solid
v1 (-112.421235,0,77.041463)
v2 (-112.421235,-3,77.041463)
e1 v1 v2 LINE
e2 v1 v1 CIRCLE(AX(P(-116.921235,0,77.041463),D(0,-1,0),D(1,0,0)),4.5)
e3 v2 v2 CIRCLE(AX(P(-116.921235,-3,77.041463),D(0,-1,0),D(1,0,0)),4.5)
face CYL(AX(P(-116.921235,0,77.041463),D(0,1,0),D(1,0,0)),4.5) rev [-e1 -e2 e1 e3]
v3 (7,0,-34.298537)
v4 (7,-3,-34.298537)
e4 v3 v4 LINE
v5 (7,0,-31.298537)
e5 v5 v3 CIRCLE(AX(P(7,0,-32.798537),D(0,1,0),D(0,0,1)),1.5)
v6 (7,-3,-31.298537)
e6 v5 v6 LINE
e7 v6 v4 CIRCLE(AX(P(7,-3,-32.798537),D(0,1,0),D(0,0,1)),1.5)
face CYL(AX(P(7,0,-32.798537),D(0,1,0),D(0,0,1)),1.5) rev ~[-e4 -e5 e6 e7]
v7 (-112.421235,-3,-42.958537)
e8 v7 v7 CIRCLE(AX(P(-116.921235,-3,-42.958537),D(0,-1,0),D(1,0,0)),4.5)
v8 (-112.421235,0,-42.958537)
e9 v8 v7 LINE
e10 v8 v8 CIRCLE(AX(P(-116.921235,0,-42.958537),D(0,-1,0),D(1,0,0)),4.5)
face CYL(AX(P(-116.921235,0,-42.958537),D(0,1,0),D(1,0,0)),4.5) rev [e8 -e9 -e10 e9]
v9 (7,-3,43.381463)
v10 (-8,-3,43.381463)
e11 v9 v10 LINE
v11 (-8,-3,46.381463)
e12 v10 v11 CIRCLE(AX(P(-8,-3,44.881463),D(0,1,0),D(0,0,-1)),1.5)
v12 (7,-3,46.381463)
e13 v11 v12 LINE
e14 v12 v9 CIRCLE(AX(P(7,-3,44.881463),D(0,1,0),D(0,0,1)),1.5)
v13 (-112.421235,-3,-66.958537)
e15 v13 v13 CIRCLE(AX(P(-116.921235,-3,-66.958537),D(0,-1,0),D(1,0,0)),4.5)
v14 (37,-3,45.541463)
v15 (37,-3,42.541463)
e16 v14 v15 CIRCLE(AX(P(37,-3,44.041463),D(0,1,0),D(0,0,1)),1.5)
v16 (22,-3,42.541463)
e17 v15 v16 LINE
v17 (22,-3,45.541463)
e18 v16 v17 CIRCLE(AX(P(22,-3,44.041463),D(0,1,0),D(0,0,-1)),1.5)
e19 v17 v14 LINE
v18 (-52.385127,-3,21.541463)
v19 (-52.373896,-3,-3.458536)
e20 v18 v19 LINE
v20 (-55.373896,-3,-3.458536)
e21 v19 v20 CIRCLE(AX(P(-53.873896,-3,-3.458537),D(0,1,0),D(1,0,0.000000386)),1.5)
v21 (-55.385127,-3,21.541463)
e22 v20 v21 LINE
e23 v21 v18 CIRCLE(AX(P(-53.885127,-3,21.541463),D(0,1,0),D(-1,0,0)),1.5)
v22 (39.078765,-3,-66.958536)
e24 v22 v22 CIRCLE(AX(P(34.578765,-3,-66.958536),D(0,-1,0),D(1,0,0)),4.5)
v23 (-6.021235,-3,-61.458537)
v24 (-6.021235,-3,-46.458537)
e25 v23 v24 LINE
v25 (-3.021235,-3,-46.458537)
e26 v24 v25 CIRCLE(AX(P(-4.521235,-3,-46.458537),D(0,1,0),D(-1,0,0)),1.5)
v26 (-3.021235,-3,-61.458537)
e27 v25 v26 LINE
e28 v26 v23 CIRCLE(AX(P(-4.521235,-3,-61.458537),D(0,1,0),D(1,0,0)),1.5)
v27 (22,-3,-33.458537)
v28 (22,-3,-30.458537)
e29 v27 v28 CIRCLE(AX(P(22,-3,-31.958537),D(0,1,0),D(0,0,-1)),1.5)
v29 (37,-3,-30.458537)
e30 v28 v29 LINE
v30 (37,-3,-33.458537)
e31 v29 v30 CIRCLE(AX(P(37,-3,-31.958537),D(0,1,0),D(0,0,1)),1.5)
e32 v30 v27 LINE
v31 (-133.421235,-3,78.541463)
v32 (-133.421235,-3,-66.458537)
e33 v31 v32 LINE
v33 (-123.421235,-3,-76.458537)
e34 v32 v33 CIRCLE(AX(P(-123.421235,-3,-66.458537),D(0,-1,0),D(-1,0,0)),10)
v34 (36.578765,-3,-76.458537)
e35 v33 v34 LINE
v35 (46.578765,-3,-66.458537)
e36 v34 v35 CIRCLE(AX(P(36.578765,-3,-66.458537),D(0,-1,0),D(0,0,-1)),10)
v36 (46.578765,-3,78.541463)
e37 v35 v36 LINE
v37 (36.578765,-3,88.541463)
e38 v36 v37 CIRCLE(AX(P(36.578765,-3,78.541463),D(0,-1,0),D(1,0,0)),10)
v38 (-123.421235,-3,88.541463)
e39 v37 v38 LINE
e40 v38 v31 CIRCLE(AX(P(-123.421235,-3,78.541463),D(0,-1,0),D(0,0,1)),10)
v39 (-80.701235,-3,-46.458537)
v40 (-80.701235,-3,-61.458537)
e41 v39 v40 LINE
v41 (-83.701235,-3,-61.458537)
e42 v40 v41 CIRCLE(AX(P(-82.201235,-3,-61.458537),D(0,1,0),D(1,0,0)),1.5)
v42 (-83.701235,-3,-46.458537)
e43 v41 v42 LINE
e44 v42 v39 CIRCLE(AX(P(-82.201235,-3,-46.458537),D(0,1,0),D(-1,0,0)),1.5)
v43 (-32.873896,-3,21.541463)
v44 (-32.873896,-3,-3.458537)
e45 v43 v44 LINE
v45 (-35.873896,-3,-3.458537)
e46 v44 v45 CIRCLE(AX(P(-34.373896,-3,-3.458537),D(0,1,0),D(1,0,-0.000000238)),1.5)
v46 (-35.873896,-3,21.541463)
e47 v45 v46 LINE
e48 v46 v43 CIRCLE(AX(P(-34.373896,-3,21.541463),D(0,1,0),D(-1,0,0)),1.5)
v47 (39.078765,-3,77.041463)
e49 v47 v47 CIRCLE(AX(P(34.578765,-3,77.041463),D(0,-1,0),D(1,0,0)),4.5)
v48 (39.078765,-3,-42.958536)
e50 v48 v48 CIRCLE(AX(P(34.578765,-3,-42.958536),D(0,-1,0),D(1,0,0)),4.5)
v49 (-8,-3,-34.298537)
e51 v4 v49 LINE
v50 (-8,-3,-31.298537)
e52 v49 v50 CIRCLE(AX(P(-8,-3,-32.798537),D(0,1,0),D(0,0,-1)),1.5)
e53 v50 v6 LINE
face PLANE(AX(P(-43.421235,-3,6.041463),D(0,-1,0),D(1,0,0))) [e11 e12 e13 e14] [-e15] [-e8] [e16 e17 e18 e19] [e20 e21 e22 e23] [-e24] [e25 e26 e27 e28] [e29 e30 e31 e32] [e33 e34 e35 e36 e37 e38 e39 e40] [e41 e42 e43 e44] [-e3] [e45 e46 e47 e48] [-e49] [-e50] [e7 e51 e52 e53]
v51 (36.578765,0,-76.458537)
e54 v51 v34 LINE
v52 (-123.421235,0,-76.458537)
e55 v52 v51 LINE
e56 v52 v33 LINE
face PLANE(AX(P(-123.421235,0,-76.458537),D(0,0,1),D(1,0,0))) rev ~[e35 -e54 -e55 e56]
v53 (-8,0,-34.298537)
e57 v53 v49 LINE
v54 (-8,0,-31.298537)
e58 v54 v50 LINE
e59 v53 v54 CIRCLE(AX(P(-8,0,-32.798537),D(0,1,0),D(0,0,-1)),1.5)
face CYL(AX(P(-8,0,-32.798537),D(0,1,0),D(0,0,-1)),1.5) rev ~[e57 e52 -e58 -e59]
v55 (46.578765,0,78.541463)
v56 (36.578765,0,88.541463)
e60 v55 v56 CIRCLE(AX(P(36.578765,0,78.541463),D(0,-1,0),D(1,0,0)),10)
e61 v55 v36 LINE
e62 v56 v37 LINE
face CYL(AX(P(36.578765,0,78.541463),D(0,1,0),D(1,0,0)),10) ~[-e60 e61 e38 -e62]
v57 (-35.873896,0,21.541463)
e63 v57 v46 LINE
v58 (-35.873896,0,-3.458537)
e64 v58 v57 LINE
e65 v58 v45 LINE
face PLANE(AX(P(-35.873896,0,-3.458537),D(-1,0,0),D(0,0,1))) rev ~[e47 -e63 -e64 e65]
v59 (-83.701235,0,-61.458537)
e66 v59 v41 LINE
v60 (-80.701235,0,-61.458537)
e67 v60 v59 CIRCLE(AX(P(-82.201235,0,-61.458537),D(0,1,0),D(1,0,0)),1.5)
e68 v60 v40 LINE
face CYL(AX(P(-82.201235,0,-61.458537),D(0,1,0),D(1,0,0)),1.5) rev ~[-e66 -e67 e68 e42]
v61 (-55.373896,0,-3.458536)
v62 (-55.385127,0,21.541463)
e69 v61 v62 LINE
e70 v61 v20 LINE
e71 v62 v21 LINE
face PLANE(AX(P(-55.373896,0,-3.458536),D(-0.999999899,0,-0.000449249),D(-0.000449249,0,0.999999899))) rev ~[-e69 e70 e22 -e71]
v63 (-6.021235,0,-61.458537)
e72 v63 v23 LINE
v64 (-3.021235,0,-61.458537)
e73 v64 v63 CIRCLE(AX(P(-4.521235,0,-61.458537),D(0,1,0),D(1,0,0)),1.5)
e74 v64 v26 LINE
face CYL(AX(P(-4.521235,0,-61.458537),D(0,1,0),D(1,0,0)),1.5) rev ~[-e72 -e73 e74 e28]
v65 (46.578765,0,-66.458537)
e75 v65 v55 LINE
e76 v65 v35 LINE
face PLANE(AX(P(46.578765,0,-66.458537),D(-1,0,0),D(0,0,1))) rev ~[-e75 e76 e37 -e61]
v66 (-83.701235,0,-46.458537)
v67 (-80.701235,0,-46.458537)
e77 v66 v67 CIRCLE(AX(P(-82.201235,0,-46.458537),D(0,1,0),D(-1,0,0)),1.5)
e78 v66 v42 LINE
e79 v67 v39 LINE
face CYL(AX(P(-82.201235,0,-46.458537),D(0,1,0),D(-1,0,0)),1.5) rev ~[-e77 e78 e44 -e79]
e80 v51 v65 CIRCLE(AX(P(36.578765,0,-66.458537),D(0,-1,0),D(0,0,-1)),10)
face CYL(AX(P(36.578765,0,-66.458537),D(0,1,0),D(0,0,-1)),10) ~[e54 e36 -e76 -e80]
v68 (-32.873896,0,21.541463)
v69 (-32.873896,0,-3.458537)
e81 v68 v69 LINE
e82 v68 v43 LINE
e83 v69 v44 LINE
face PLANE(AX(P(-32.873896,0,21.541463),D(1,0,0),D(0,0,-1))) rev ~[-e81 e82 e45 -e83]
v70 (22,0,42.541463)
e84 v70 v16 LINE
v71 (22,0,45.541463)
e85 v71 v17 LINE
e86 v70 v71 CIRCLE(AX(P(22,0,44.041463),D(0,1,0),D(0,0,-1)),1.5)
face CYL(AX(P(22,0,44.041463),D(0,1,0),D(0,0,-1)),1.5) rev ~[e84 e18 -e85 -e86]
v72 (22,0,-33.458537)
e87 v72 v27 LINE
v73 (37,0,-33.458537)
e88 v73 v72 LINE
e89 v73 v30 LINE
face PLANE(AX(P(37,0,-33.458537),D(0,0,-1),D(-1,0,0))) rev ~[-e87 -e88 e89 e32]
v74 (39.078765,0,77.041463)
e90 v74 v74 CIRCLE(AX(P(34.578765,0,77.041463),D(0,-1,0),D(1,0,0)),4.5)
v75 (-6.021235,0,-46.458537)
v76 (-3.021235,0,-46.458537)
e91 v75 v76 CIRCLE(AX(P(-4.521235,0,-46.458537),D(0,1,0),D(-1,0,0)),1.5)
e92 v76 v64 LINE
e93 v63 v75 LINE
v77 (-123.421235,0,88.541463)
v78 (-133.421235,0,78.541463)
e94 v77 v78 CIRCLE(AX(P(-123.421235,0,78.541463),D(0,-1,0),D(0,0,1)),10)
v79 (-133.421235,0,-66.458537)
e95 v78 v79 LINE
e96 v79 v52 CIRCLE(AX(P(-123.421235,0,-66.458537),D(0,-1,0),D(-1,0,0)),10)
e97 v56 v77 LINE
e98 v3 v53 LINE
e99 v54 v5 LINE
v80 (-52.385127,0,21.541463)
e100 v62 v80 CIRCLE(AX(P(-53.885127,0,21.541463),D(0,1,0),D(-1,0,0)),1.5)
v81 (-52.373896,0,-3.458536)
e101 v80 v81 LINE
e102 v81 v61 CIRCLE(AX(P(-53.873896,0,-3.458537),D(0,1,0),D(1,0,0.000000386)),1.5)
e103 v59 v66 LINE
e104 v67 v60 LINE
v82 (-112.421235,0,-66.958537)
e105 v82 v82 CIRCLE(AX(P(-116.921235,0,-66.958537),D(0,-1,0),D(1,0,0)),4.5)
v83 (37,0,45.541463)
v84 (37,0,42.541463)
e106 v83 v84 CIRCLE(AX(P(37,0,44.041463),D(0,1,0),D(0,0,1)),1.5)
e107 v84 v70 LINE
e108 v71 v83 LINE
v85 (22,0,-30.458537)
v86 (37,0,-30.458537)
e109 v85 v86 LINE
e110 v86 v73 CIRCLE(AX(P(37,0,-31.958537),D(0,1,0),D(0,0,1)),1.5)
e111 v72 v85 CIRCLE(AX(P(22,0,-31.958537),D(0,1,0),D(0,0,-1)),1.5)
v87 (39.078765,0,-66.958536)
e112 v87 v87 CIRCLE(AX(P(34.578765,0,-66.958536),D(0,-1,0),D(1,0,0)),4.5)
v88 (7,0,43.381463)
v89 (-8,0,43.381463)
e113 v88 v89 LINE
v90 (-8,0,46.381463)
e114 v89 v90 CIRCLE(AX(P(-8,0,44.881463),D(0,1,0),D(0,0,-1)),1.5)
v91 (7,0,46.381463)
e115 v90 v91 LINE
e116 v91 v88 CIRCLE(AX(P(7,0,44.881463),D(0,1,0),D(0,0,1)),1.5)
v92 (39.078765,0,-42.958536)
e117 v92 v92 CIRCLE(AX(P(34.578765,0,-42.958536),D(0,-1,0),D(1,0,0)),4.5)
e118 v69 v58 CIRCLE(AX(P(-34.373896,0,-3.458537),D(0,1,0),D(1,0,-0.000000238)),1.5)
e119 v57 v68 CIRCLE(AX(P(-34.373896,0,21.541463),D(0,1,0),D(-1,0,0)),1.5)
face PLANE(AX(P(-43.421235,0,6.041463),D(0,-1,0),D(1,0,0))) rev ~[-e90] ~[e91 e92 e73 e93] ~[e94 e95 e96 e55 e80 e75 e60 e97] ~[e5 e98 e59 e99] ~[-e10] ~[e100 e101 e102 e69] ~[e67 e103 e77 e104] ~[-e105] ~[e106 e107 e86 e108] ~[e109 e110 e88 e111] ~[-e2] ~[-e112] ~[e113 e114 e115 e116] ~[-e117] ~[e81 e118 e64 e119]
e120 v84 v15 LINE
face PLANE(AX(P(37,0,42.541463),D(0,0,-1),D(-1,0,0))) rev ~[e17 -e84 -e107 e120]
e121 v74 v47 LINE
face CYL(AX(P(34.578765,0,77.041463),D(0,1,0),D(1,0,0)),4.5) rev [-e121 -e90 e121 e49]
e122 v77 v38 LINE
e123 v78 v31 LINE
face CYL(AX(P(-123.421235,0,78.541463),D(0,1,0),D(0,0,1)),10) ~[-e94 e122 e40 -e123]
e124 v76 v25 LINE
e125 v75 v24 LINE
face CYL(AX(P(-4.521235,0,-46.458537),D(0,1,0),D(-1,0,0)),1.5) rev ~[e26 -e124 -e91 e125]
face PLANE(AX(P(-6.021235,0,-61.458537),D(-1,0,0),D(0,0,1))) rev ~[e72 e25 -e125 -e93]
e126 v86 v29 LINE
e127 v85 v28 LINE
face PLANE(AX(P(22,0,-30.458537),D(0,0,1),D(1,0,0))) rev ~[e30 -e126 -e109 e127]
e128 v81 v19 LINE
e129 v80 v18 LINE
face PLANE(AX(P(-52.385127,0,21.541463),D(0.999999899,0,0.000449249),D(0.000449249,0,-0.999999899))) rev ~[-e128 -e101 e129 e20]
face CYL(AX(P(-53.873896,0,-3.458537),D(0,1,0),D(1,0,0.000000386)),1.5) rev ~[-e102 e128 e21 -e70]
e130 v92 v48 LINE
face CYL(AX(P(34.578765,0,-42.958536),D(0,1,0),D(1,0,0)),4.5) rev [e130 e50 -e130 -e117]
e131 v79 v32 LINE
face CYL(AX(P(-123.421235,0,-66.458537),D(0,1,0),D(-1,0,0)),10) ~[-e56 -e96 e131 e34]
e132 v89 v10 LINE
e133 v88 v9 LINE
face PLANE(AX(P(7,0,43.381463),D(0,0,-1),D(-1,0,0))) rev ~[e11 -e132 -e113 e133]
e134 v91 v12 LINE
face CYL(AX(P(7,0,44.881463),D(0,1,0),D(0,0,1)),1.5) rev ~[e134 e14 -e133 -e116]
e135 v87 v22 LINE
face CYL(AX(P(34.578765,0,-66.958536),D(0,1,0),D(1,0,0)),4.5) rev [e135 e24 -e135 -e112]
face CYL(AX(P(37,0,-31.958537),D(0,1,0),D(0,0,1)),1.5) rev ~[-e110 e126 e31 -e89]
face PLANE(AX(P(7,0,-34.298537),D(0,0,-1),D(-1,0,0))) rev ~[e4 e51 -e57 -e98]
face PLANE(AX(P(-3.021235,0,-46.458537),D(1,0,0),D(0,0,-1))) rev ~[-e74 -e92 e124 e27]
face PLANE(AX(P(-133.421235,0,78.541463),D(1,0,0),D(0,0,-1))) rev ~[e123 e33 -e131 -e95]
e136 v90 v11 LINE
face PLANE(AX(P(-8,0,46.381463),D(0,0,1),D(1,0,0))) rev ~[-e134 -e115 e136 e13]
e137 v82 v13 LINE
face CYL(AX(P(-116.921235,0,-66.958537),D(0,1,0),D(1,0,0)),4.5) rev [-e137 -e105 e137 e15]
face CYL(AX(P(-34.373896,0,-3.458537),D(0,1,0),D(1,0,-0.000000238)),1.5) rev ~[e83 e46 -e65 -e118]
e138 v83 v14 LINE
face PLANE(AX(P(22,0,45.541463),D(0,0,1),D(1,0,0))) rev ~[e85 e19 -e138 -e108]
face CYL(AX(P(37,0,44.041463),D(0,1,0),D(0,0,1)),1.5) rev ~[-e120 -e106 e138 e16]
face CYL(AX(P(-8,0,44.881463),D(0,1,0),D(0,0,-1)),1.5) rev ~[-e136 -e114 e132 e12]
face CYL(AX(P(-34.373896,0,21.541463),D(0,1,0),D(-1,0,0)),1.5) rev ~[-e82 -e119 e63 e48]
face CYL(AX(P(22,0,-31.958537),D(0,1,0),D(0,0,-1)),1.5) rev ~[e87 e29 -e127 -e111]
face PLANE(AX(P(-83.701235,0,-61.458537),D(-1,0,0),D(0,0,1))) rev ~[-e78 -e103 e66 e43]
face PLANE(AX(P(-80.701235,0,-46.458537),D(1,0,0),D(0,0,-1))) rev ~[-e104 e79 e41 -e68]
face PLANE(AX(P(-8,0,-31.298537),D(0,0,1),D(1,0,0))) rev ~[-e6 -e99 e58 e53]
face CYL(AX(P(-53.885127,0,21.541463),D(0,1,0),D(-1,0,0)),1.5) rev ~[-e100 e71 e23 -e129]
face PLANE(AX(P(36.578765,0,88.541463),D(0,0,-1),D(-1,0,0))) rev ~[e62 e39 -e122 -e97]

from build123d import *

# Parameters (mm, degrees)
F0_R     = 4.5
F1_DEPTH = 3


# Not quite as in the source:
# - ends of sketch curves that miss each other by under 0.0002 mm in the source are joined


with BuildPart() as f1:
    # F0 (on Front) → F1 (new body)
    with BuildSketch(Plane.XZ):
        with BuildLine():
            ThreePointArc((-123.4212349358, 88.5414632024), (-130.4923027477, 85.6125310143), (-133.4212349358, 78.5414632024))
            Line((-133.4212349358, 78.5414632024), (-133.4212349358, -66.4585367976))
            ThreePointArc((-133.4212349358, -66.4585367976), (-130.4923027477, -73.5296046095), (-123.4212349358, -76.4585367976))
            Line((-123.4212349358, -76.4585367976), (36.5787650642, -76.4585367976))
            ThreePointArc((36.5787650642, -76.4585367976), (43.6498328761, -73.5296046095), (46.5787650642, -66.4585367976))
            Line((46.5787650642, -66.4585367976), (46.5787650642, 78.5414632024))
            ThreePointArc((46.5787650642, 78.5414632024), (43.6498328761, 85.6125310143), (36.5787650642, 88.5414632024))
            Line((36.5787650642, 88.5414632024), (-123.4212349358, 88.5414632024))
        make_face()
        with Locations((-116.9212349358, -66.9585367976)):
            Circle(F0_R, mode=Mode.SUBTRACT)
        with Locations((-116.9212349358, -42.9585367976)):
            Circle(F0_R, mode=Mode.SUBTRACT)
        with BuildLine():
            Line((-80.7012349358, -46.4585367976), (-80.7012349358, -61.4585367976))
            ThreePointArc((-80.7012349358, -61.4585367976), (-82.2012349358, -62.9585367976), (-83.7012349358, -61.4585367976))
            Line((-83.7012349358, -61.4585367976), (-83.7012349358, -46.4585367976))
            ThreePointArc((-83.7012349358, -46.4585367976), (-82.2012349358, -44.9585367976), (-80.7012349358, -46.4585367976))
        make_face(mode=Mode.SUBTRACT)
        with BuildLine():
            ThreePointArc((-3.0212349358, -61.4585367976), (-4.5212349358, -62.9585367976), (-6.0212349358, -61.4585367976))
            Line((-6.0212349358, -61.4585367976), (-6.0212349358, -46.4585367976))
            ThreePointArc((-6.0212349358, -46.4585367976), (-4.5212349358, -44.9585367976), (-3.0212349358, -46.4585367976))
            Line((-3.0212349358, -46.4585367976), (-3.0212349358, -61.4585367976))
        make_face(mode=Mode.SUBTRACT)
        with Locations((34.5787650642, -66.9585362183)):
            Circle(F0_R, mode=Mode.SUBTRACT)
        with Locations((34.5787650642, -42.9585362183)):
            Circle(F0_R, mode=Mode.SUBTRACT)
        with BuildLine():
            ThreePointArc((-8, -34.2985367976), (-9.5, -32.7985367976), (-8, -31.2985367976))
            Line((-8, -31.2985367976), (7, -31.2985367976))
            ThreePointArc((7, -31.2985367976), (8.5, -32.7985367976), (7, -34.2985367976))
            Line((7, -34.2985367976), (0, -34.2985367976))
            Line((0, -34.2985367976), (-8, -34.2985367976))
        make_face(mode=Mode.SUBTRACT)
        with BuildLine():
            ThreePointArc((22, -33.4585367976), (20.5, -31.9585367976), (22, -30.4585367976))
            Line((22, -30.4585367976), (37, -30.4585367976))
            ThreePointArc((37, -30.4585367976), (38.5, -31.9585367976), (37, -33.4585367976))
            Line((37, -33.4585367976), (22, -33.4585367976))
        make_face(mode=Mode.SUBTRACT)
        with BuildLine():
            ThreePointArc((-55.3851271454, 21.5414632024), (-53.8851271454, 23.0414632024), (-52.3851271454, 21.5414632024))
            Line((-52.3851271454, 21.5414632024), (-52.3738959134, -3.4585362183))
            ThreePointArc((-52.3738959134, -3.4585362183), (-53.8738959134, -4.9585367976), (-55.3738959134, -3.4585362183))
            Line((-55.3738959134, -3.4585362183), (-55.3851271454, 21.5414632024))
        make_face(mode=Mode.SUBTRACT)
        with Locations((-116.9212349358, 77.0414632024)):
            Circle(F0_R, mode=Mode.SUBTRACT)
        with BuildLine():
            ThreePointArc((-32.8738959134, -3.4585371545), (-34.3738959134, -4.9585367976), (-35.8738959134, -3.4585371545))
            Line((-35.8738959134, -3.4585371545), (-35.8738959134, 21.5414632024))
            ThreePointArc((-35.8738959134, 21.5414632024), (-34.3738959134, 23.0414632024), (-32.8738959134, 21.5414632024))
            Line((-32.8738959134, 21.5414632024), (-32.8738959134, -3.4585371545))
        make_face(mode=Mode.SUBTRACT)
        with BuildLine():
            Line((7, 43.3814632024), (-8, 43.3814632024))
            ThreePointArc((-8, 43.3814632024), (-9.5, 44.8814632024), (-8, 46.3814632024))
            Line((-8, 46.3814632024), (7, 46.3814632024))
            ThreePointArc((7, 46.3814632024), (8.5, 44.8814632024), (7, 43.3814632024))
        make_face(mode=Mode.SUBTRACT)
        with BuildLine():
            Line((22, 45.5414632024), (37, 45.5414632024))
            ThreePointArc((37, 45.5414632024), (38.5, 44.0414632024), (37, 42.5414632024))
            Line((37, 42.5414632024), (22, 42.5414632024))
            ThreePointArc((22, 42.5414632024), (20.5, 44.0414632024), (22, 45.5414632024))
        make_face(mode=Mode.SUBTRACT)
        with Locations((34.5787650642, 77.0414632024)):
            Circle(F0_R, mode=Mode.SUBTRACT)
    extrude(amount=F1_DEPTH)


solid = f1.part
